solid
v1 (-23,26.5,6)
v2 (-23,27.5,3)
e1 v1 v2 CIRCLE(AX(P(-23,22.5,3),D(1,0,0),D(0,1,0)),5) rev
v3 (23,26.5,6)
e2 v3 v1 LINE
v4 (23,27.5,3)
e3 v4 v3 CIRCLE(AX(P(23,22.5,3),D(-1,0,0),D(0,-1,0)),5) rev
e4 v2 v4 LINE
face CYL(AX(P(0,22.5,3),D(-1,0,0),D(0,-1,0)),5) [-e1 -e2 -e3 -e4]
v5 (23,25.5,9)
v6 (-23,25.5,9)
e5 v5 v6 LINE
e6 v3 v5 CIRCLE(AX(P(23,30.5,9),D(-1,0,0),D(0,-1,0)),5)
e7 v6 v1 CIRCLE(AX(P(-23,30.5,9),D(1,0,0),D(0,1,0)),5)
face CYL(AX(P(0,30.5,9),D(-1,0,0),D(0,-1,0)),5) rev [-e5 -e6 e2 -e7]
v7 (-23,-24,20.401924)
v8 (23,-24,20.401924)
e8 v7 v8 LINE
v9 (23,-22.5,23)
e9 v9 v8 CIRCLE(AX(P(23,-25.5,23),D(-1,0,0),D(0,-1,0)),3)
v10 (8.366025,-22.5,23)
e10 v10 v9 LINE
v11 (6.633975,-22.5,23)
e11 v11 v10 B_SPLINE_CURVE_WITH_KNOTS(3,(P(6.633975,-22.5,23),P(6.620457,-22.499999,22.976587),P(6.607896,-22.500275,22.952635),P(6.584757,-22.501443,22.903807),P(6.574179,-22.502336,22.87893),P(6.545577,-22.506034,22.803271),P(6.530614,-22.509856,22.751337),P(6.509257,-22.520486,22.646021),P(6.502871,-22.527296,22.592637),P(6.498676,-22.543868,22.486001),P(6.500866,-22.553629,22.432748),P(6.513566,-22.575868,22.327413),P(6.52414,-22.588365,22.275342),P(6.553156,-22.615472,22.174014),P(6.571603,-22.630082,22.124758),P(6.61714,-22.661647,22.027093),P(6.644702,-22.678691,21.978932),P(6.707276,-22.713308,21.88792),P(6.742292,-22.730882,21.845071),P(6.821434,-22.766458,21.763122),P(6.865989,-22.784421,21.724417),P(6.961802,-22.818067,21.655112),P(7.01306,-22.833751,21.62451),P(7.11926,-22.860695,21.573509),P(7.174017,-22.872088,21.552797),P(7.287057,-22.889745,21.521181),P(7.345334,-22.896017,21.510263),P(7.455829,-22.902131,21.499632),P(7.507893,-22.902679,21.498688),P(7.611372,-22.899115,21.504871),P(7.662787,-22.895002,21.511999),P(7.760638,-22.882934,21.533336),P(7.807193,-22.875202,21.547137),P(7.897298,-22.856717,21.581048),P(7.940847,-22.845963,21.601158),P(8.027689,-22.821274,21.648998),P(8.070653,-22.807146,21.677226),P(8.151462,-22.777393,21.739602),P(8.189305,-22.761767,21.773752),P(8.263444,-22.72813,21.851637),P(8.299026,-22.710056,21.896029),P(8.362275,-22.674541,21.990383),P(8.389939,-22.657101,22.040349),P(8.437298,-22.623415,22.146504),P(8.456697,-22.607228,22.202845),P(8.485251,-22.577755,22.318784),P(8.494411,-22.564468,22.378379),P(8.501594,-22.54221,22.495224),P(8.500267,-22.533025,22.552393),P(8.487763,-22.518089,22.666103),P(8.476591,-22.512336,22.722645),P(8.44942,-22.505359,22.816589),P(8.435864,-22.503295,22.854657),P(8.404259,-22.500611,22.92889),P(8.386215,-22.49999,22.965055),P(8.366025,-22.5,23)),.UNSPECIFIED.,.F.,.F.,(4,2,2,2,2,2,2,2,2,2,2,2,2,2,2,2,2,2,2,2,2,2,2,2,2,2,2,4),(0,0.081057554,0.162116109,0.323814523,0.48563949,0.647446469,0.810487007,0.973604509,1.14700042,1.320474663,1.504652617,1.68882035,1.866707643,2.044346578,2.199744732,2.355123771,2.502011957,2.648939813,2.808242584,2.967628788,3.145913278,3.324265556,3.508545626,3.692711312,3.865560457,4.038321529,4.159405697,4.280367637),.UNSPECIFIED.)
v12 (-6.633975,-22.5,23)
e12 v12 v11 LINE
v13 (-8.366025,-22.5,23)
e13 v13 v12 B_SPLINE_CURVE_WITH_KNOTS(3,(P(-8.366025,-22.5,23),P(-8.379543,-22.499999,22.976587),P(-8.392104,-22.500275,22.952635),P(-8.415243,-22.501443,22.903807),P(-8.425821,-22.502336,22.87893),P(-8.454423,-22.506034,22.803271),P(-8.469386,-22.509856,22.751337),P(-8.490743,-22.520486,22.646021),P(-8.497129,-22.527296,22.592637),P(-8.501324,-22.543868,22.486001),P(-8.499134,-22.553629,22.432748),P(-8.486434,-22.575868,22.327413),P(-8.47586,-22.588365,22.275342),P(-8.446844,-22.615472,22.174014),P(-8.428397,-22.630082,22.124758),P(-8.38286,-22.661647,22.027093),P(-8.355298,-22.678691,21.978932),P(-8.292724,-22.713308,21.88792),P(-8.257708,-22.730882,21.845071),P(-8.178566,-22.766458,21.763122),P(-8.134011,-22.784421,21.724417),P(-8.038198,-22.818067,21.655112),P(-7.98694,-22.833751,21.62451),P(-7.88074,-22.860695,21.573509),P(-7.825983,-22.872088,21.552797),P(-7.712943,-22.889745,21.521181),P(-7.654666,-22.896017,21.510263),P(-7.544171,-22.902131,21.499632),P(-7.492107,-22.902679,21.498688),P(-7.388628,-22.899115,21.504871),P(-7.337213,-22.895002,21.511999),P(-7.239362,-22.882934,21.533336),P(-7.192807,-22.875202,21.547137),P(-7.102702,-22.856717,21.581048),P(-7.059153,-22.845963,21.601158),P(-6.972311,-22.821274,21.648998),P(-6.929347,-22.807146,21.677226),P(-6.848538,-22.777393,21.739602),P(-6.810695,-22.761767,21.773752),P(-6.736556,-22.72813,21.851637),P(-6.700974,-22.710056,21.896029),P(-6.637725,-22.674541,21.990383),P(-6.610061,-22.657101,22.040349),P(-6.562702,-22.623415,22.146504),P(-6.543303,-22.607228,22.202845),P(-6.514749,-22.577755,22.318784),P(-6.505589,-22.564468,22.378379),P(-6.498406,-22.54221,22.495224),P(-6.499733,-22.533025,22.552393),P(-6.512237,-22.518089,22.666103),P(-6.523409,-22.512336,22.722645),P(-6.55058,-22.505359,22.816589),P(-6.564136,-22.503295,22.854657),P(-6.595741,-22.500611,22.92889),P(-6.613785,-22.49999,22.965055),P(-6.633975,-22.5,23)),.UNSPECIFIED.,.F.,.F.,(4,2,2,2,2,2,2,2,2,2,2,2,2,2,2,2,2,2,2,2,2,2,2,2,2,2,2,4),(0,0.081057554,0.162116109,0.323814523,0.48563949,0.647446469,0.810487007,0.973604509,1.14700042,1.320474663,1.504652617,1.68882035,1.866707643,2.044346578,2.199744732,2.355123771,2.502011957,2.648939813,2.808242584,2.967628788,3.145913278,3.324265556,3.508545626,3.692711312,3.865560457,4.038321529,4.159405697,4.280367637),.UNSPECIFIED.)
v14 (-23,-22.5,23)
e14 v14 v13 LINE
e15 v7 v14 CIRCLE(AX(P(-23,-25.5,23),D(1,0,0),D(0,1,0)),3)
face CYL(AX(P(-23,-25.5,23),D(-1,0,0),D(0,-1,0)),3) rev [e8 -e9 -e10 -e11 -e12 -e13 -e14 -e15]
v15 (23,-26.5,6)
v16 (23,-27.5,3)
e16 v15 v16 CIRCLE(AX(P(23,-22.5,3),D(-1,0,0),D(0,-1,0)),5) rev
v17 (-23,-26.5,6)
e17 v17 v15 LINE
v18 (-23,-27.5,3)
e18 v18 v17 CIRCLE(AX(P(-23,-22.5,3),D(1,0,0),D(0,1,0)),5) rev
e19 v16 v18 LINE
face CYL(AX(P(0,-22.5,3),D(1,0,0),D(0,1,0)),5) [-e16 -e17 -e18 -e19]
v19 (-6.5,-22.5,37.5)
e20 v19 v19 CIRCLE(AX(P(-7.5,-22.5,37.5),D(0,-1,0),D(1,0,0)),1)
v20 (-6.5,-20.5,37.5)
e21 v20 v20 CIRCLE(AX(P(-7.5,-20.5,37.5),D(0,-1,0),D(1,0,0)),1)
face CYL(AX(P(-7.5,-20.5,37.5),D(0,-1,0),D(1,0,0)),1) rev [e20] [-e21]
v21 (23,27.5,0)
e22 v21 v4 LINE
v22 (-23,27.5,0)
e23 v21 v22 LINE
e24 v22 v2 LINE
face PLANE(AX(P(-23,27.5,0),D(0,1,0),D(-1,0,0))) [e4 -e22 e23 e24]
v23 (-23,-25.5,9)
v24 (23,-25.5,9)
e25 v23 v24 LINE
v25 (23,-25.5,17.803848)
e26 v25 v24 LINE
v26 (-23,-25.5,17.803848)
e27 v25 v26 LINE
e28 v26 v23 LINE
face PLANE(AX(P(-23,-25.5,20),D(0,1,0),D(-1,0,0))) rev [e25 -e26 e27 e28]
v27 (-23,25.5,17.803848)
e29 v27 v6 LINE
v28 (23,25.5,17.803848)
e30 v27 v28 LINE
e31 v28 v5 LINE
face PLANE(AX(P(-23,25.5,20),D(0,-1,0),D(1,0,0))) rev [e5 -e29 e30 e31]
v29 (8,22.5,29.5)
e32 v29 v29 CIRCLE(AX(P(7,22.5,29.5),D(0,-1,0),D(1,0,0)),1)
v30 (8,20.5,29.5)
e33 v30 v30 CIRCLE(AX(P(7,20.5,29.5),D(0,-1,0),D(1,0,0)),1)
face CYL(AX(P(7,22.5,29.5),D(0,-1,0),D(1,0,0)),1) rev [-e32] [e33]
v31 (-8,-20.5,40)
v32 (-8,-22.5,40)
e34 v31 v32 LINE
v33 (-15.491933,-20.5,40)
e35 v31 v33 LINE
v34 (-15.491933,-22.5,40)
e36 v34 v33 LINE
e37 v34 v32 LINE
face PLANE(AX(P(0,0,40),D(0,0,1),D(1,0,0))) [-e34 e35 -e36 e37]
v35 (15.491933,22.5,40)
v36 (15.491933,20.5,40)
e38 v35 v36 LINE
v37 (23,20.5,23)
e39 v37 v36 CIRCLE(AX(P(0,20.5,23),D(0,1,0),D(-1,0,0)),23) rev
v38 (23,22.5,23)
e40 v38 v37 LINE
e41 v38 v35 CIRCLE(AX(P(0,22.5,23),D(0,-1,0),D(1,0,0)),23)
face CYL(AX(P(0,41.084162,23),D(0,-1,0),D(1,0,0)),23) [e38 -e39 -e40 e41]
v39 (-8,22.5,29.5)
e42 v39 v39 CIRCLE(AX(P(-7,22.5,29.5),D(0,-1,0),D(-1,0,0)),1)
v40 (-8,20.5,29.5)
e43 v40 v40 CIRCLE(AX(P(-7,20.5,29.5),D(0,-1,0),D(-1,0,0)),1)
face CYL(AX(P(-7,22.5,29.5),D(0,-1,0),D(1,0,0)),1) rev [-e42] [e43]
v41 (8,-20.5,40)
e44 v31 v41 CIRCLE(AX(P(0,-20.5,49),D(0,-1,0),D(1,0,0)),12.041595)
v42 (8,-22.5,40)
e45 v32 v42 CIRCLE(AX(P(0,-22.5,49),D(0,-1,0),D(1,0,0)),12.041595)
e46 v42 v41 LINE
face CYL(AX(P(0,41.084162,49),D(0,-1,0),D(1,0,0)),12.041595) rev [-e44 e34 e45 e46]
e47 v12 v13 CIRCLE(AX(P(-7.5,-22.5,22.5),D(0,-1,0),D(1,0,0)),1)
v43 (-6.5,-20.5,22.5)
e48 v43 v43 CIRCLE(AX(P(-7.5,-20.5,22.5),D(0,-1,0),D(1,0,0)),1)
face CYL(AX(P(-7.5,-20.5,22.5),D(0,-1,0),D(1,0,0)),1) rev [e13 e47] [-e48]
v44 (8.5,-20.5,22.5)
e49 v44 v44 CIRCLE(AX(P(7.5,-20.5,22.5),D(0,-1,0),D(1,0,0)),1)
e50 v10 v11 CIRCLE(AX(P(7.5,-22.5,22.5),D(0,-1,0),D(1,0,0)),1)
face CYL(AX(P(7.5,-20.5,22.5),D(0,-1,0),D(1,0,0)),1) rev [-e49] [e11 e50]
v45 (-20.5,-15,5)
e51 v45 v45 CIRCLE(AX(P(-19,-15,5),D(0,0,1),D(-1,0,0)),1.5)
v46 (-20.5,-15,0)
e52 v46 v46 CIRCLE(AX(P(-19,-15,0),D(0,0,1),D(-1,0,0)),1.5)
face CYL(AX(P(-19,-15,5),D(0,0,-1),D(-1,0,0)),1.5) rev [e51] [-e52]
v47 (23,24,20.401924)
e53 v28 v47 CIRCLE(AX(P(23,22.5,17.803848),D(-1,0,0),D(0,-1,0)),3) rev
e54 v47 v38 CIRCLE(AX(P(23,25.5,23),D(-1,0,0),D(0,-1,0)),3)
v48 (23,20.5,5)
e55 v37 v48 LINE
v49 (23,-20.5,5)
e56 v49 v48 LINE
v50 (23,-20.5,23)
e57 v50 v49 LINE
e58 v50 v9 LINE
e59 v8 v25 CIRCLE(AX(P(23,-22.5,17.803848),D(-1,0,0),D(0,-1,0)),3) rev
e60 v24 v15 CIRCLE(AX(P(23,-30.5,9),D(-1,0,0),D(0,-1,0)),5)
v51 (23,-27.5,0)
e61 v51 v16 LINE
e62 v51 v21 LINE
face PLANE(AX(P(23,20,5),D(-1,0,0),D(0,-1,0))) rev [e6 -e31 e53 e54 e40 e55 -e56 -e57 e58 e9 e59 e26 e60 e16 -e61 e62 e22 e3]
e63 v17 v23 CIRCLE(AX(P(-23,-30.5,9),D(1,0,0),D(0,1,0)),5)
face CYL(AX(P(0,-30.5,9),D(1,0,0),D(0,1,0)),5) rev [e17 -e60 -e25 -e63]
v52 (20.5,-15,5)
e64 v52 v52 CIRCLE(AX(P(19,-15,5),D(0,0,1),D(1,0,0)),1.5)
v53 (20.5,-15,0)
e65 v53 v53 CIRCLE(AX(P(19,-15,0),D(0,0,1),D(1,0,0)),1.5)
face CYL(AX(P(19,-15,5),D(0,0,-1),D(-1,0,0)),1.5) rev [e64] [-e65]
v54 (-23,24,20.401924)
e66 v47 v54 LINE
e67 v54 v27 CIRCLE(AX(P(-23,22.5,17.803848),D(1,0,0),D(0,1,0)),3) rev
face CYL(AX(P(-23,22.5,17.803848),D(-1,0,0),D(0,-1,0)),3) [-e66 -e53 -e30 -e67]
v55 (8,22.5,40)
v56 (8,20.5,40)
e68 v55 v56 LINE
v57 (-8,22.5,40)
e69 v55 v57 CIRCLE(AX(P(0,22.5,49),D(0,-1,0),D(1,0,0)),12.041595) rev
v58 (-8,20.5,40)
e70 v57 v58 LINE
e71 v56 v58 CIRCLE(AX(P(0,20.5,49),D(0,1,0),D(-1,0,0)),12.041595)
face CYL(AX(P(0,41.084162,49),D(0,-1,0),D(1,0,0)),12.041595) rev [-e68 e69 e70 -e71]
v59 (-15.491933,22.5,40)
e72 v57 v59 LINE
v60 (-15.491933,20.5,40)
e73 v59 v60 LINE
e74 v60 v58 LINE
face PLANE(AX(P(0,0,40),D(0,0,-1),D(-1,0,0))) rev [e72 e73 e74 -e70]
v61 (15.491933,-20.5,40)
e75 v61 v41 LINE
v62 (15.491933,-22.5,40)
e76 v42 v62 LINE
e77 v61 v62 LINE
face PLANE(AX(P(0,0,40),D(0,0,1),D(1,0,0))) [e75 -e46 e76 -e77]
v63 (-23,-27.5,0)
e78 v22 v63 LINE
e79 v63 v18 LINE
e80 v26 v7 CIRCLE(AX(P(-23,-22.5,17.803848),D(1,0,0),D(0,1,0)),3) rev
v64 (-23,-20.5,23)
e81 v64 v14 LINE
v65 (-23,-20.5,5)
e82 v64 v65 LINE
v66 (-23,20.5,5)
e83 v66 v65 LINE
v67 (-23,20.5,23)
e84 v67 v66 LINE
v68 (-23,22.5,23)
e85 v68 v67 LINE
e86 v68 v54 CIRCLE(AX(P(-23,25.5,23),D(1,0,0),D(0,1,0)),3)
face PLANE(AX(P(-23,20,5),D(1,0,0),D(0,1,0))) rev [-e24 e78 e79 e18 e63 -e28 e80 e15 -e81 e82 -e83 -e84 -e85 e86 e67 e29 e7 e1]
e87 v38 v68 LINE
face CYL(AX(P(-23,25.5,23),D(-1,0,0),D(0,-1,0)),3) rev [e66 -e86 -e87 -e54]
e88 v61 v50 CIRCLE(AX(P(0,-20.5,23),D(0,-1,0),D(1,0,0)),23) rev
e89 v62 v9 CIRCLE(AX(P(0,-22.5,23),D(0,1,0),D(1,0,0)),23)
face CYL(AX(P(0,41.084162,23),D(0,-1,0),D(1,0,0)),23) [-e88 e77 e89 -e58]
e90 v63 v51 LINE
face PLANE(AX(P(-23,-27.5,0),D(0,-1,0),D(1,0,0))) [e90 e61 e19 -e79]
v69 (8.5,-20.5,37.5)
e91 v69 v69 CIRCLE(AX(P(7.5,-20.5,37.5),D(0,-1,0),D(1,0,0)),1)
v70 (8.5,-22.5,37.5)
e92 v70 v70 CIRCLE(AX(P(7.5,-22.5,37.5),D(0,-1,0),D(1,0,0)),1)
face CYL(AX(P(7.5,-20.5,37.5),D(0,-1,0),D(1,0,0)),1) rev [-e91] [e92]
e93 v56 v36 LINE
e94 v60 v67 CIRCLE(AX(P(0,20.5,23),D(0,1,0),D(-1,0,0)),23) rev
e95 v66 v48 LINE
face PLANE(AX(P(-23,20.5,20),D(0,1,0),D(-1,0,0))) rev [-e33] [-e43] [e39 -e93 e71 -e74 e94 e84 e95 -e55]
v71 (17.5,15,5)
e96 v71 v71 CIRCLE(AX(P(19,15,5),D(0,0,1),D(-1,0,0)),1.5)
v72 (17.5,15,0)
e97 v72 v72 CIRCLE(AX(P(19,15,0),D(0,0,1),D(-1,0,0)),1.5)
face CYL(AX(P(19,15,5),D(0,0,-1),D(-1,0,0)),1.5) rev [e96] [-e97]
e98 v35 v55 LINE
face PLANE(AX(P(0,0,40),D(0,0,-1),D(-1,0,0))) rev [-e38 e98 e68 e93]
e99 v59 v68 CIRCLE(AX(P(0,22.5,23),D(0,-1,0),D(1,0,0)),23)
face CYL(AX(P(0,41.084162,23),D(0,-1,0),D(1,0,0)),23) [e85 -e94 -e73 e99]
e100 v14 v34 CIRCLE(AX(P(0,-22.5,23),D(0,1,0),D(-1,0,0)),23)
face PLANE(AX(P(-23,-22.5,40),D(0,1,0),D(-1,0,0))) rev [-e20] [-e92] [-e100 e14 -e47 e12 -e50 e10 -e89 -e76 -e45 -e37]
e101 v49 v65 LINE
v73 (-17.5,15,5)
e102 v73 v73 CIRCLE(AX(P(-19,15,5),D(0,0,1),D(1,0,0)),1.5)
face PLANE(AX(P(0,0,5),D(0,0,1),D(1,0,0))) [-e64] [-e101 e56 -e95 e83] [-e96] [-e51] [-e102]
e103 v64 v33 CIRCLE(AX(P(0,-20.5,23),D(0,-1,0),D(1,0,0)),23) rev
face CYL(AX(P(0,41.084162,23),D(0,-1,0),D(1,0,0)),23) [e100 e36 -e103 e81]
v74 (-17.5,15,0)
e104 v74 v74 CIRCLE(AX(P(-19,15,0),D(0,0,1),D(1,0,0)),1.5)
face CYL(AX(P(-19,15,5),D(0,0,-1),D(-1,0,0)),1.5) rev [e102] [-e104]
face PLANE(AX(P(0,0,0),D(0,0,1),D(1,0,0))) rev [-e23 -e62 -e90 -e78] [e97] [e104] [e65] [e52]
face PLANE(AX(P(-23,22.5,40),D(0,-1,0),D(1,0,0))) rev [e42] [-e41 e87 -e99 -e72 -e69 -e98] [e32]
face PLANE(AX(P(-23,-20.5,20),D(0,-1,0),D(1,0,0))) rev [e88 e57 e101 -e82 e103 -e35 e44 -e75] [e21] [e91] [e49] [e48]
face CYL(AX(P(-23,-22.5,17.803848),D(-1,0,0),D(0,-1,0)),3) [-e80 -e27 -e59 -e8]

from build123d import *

# Parameters (mm, degrees)
SKETCH_1_W          = 46
SKETCH_1_H          = 40
SKETCH_1_R          = 1.5
EXTRUDE_1_DEPTH     = 5
SKETCH_2_W          = 46
SKETCH_2_H          = 7.5
EXTRUDE_2_DEPTH     = 5
SKETCH_3_W          = 46
SKETCH_3_H          = 5
EXTRUDE_3_DEPTH     = 15
FILLET_1_R          = 5
FILLET_2_R          = 5
SKETCH_4_W          = 46
SKETCH_4_H          = 2
EXTRUDE_4_DEPTH     = 20
SKETCH_5_R          = 1
CUT_EXTRUDE_1_DEPTH = 2
SKETCH_6_R          = 1
CUT_EXTRUDE_2_DEPTH = 2
FILLET_3_R          = 3
FILLET_4_R          = 3
CUT_EXTRUDE_3_REACH = 70.037


with BuildPart() as part:
    # 草图1 → 凸台-拉伸1 (new body)
    with BuildSketch(Plane.XY):
        Rectangle(SKETCH_1_W, SKETCH_1_H)
        with Locations((-19, 15)):
            Circle(SKETCH_1_R, mode=Mode.SUBTRACT)
        with Locations(Location((19, 15, 0), (0, 0, 180))):
            Circle(SKETCH_1_R, mode=Mode.SUBTRACT)
        with Locations((19, -15)):
            Circle(SKETCH_1_R, mode=Mode.SUBTRACT)
        with Locations(Location((-19, -15, 0), (0, 0, 180))):
            Circle(SKETCH_1_R, mode=Mode.SUBTRACT)
    extrude(amount=EXTRUDE_1_DEPTH)

    # 草图2 → 凸台-拉伸2 (add)
    with BuildSketch(Plane.XY.offset(5)):
        with Locations((0, -23.75)):
            Rectangle(SKETCH_2_W, SKETCH_2_H)
        with Locations((0, 23.75)):
            Rectangle(SKETCH_2_W, SKETCH_2_H)
    extrude(amount=-EXTRUDE_2_DEPTH)

    # 草图3 → 凸台-拉伸3 (add)
    with BuildSketch(Plane.XY.offset(5)):
        with Locations((0, -23)):
            Rectangle(SKETCH_3_W, SKETCH_3_H)
        with Locations((0, 23)):
            Rectangle(SKETCH_3_W, SKETCH_3_H)
    extrude(amount=EXTRUDE_3_DEPTH)

    # 圆角1
    # the kernel refuses this fillet: 5 mm, written as the material it adds along each edge
    with BuildSketch(Plane(origin=(23, -25.5, 5), x_dir=(0, -1, 0), z_dir=(-1, 0, 0)), Plane(origin=(-23, 25.5, 5), x_dir=(0, 1, 0), z_dir=(1, 0, 0))) as fillet_1_piece_1:
        with BuildLine():
            CenterArc((5, 4), FILLET_1_R, 180, 53.130102354)
            Line((0, 4), (-0.1, 4))
            Line((-0.1, 4), (-0.1, 0))
            Line((-0.1, 0), (0, -0.1))
            ThreePointArc((0, -0.1), (1, -0.1), (1.94, -0.08))
            Line((1.94, -0.08), (2, 0))
        make_face()
    extrude(amount=46)

    # 圆角2
    fillet_2_edges = [part.edges().sort_by_distance(p)[0] for p in [
        (0, 27.5, 5),
        (0, -27.5, 5),
    ]]
    fillet(fillet_2_edges, radius=FILLET_2_R)

    # 草图4 → 凸台-拉伸4 (add)
    with BuildSketch(Plane.XY.offset(20)):
        with Locations((0, 21.5)):
            Rectangle(SKETCH_4_W, SKETCH_4_H)
        with Locations((0, -21.5)):
            Rectangle(SKETCH_4_W, SKETCH_4_H)
    extrude(amount=EXTRUDE_4_DEPTH)

    # 草图5 → 切除-拉伸1 (cut)
    with BuildSketch(Plane.XZ.offset(22.5)):
        with Locations((-7.5, 37.5)):
            Circle(SKETCH_5_R)
        with Locations((7.5, 37.5)):
            Circle(SKETCH_5_R)
        with Locations((-7.5, 22.5)):
            Circle(SKETCH_5_R)
        with Locations((7.5, 22.5)):
            Circle(SKETCH_5_R)
    extrude(amount=-CUT_EXTRUDE_1_DEPTH, mode=Mode.SUBTRACT)

    # 草图6 → 切除-拉伸2 (cut)
    with BuildSketch(Plane.XZ.offset(-20.5)):
        with Locations((7, 29.5)):
            Circle(SKETCH_6_R)
        with Locations(Location((-7, 29.5, 0), (0, 0, 180))):
            Circle(SKETCH_6_R)
    extrude(amount=-CUT_EXTRUDE_2_DEPTH, mode=Mode.SUBTRACT)

    # 圆角3
    # the kernel refuses this fillet: 3 mm, written as the material it adds along each edge
    with BuildSketch(Plane(origin=(-23, -22.5, 20), x_dir=(0, 0, 1), z_dir=(1, 0, 0))) as fillet_3_piece_1_section:
        with BuildLine():
            CenterArc((FILLET_3_R, FILLET_3_R), FILLET_3_R, 180, 90)
            Line((0, FILLET_3_R), (0, 0))
            Line((0, 0), (FILLET_3_R, 0))
        make_face()
    fillet_3_piece_1 = extrude(amount=46, mode=Mode.PRIVATE)
    fillet_3_piece_1 = fillet_3_piece_1 - Plane(origin=(-7.5, -23.184161647, 22.5), x_dir=(1, 0, 0), z_dir=(0, -1, 0)) * Cylinder(1, 104, mode=Mode.PRIVATE)
    fillet_3_piece_1 = fillet_3_piece_1 - Plane(origin=(7.5, -23.184161647, 22.5), x_dir=(1, 0, 0), z_dir=(0, -1, 0)) * Cylinder(1, 104, mode=Mode.PRIVATE)
    add(fillet_3_piece_1)
    with BuildSketch(Plane(origin=(23, 22.5, 20), x_dir=(0, 1, 0), z_dir=(-1, 0, 0))) as fillet_3_piece_2:
        with BuildLine():
            CenterArc((FILLET_3_R, -FILLET_3_R), FILLET_3_R, 90, 90)
            Line((0, -FILLET_3_R), (0, 0))
            Line((0, 0), (FILLET_3_R, 0))
        make_face()
    extrude(amount=46)

    # 圆角4
    fillet_4_edges = [part.edges().sort_by_distance(p)[0] for p in [
        (0, 25.5, 20),
        (0, -25.5, 20),
    ]]
    fillet(fillet_4_edges, radius=FILLET_4_R)

    # 切除-拉伸3: up to this face of the body (flat: up to its plane)
    cut_extrude_3_end = Plane(part.part.faces().sort_by_distance((0, 22.5, 31.516199688))[0])
    # 草图7 → 切除-拉伸3 (cut, up to the picked face)
    with BuildSketch(Plane.XZ.offset(22.5), mode=Mode.PRIVATE) as cut_extrude_3_sk1:
        with BuildLine():
            Line((-8, 40), (8, 40))
            ThreePointArc((8, 40), (0, 36.958405421), (-8, 40))
        make_face()
    cut_extrude_3_tool1 = split(extrude(cut_extrude_3_sk1.sketch, amount=-CUT_EXTRUDE_3_REACH, mode=Mode.PRIVATE), bisect_by=cut_extrude_3_end, keep=Keep.BOTH, mode=Mode.PRIVATE)
    # 草图7 → 切除-拉伸3 (cut, up to the picked face)
    with BuildSketch(Plane.XZ.offset(22.5), mode=Mode.PRIVATE) as cut_extrude_3_sk2:
        with BuildLine():
            Line((-23, 23), (-23, 40))
            Line((-23, 40), (-15.491933385, 40))
            ThreePointArc((-15.491933385, 40), (-21.03942095, 32.292080826), (-23, 23))
        make_face()
    cut_extrude_3_tool2 = split(extrude(cut_extrude_3_sk2.sketch, amount=-CUT_EXTRUDE_3_REACH, mode=Mode.PRIVATE), bisect_by=cut_extrude_3_end, keep=Keep.BOTH, mode=Mode.PRIVATE)
    # 草图7 → 切除-拉伸3 (cut, up to the picked face)
    with BuildSketch(Plane.XZ.offset(22.5), mode=Mode.PRIVATE) as cut_extrude_3_sk3:
        with BuildLine():
            Line((23, 23), (23, 40))
            Line((23, 40), (15.491933385, 40))
            ThreePointArc((15.491933385, 40), (21.03942095, 32.292080826), (23, 23))
        make_face()
    cut_extrude_3_tool3 = split(extrude(cut_extrude_3_sk3.sketch, amount=-CUT_EXTRUDE_3_REACH, mode=Mode.PRIVATE), bisect_by=cut_extrude_3_end, keep=Keep.BOTH, mode=Mode.PRIVATE)
    add(cut_extrude_3_tool1.solids().sort_by(Axis((0, -22.5, 38.769148), (0, 1, 0)))[0], mode=Mode.SUBTRACT)
    add(cut_extrude_3_tool2.solids().sort_by(Axis((-20.828476, -22.5, 35.901225), (0, 1, 0)))[0], mode=Mode.SUBTRACT)
    add(cut_extrude_3_tool3.solids().sort_by(Axis((20.828476, -22.5, 35.901225), (0, 1, 0)))[0], mode=Mode.SUBTRACT)


solid = part.part
